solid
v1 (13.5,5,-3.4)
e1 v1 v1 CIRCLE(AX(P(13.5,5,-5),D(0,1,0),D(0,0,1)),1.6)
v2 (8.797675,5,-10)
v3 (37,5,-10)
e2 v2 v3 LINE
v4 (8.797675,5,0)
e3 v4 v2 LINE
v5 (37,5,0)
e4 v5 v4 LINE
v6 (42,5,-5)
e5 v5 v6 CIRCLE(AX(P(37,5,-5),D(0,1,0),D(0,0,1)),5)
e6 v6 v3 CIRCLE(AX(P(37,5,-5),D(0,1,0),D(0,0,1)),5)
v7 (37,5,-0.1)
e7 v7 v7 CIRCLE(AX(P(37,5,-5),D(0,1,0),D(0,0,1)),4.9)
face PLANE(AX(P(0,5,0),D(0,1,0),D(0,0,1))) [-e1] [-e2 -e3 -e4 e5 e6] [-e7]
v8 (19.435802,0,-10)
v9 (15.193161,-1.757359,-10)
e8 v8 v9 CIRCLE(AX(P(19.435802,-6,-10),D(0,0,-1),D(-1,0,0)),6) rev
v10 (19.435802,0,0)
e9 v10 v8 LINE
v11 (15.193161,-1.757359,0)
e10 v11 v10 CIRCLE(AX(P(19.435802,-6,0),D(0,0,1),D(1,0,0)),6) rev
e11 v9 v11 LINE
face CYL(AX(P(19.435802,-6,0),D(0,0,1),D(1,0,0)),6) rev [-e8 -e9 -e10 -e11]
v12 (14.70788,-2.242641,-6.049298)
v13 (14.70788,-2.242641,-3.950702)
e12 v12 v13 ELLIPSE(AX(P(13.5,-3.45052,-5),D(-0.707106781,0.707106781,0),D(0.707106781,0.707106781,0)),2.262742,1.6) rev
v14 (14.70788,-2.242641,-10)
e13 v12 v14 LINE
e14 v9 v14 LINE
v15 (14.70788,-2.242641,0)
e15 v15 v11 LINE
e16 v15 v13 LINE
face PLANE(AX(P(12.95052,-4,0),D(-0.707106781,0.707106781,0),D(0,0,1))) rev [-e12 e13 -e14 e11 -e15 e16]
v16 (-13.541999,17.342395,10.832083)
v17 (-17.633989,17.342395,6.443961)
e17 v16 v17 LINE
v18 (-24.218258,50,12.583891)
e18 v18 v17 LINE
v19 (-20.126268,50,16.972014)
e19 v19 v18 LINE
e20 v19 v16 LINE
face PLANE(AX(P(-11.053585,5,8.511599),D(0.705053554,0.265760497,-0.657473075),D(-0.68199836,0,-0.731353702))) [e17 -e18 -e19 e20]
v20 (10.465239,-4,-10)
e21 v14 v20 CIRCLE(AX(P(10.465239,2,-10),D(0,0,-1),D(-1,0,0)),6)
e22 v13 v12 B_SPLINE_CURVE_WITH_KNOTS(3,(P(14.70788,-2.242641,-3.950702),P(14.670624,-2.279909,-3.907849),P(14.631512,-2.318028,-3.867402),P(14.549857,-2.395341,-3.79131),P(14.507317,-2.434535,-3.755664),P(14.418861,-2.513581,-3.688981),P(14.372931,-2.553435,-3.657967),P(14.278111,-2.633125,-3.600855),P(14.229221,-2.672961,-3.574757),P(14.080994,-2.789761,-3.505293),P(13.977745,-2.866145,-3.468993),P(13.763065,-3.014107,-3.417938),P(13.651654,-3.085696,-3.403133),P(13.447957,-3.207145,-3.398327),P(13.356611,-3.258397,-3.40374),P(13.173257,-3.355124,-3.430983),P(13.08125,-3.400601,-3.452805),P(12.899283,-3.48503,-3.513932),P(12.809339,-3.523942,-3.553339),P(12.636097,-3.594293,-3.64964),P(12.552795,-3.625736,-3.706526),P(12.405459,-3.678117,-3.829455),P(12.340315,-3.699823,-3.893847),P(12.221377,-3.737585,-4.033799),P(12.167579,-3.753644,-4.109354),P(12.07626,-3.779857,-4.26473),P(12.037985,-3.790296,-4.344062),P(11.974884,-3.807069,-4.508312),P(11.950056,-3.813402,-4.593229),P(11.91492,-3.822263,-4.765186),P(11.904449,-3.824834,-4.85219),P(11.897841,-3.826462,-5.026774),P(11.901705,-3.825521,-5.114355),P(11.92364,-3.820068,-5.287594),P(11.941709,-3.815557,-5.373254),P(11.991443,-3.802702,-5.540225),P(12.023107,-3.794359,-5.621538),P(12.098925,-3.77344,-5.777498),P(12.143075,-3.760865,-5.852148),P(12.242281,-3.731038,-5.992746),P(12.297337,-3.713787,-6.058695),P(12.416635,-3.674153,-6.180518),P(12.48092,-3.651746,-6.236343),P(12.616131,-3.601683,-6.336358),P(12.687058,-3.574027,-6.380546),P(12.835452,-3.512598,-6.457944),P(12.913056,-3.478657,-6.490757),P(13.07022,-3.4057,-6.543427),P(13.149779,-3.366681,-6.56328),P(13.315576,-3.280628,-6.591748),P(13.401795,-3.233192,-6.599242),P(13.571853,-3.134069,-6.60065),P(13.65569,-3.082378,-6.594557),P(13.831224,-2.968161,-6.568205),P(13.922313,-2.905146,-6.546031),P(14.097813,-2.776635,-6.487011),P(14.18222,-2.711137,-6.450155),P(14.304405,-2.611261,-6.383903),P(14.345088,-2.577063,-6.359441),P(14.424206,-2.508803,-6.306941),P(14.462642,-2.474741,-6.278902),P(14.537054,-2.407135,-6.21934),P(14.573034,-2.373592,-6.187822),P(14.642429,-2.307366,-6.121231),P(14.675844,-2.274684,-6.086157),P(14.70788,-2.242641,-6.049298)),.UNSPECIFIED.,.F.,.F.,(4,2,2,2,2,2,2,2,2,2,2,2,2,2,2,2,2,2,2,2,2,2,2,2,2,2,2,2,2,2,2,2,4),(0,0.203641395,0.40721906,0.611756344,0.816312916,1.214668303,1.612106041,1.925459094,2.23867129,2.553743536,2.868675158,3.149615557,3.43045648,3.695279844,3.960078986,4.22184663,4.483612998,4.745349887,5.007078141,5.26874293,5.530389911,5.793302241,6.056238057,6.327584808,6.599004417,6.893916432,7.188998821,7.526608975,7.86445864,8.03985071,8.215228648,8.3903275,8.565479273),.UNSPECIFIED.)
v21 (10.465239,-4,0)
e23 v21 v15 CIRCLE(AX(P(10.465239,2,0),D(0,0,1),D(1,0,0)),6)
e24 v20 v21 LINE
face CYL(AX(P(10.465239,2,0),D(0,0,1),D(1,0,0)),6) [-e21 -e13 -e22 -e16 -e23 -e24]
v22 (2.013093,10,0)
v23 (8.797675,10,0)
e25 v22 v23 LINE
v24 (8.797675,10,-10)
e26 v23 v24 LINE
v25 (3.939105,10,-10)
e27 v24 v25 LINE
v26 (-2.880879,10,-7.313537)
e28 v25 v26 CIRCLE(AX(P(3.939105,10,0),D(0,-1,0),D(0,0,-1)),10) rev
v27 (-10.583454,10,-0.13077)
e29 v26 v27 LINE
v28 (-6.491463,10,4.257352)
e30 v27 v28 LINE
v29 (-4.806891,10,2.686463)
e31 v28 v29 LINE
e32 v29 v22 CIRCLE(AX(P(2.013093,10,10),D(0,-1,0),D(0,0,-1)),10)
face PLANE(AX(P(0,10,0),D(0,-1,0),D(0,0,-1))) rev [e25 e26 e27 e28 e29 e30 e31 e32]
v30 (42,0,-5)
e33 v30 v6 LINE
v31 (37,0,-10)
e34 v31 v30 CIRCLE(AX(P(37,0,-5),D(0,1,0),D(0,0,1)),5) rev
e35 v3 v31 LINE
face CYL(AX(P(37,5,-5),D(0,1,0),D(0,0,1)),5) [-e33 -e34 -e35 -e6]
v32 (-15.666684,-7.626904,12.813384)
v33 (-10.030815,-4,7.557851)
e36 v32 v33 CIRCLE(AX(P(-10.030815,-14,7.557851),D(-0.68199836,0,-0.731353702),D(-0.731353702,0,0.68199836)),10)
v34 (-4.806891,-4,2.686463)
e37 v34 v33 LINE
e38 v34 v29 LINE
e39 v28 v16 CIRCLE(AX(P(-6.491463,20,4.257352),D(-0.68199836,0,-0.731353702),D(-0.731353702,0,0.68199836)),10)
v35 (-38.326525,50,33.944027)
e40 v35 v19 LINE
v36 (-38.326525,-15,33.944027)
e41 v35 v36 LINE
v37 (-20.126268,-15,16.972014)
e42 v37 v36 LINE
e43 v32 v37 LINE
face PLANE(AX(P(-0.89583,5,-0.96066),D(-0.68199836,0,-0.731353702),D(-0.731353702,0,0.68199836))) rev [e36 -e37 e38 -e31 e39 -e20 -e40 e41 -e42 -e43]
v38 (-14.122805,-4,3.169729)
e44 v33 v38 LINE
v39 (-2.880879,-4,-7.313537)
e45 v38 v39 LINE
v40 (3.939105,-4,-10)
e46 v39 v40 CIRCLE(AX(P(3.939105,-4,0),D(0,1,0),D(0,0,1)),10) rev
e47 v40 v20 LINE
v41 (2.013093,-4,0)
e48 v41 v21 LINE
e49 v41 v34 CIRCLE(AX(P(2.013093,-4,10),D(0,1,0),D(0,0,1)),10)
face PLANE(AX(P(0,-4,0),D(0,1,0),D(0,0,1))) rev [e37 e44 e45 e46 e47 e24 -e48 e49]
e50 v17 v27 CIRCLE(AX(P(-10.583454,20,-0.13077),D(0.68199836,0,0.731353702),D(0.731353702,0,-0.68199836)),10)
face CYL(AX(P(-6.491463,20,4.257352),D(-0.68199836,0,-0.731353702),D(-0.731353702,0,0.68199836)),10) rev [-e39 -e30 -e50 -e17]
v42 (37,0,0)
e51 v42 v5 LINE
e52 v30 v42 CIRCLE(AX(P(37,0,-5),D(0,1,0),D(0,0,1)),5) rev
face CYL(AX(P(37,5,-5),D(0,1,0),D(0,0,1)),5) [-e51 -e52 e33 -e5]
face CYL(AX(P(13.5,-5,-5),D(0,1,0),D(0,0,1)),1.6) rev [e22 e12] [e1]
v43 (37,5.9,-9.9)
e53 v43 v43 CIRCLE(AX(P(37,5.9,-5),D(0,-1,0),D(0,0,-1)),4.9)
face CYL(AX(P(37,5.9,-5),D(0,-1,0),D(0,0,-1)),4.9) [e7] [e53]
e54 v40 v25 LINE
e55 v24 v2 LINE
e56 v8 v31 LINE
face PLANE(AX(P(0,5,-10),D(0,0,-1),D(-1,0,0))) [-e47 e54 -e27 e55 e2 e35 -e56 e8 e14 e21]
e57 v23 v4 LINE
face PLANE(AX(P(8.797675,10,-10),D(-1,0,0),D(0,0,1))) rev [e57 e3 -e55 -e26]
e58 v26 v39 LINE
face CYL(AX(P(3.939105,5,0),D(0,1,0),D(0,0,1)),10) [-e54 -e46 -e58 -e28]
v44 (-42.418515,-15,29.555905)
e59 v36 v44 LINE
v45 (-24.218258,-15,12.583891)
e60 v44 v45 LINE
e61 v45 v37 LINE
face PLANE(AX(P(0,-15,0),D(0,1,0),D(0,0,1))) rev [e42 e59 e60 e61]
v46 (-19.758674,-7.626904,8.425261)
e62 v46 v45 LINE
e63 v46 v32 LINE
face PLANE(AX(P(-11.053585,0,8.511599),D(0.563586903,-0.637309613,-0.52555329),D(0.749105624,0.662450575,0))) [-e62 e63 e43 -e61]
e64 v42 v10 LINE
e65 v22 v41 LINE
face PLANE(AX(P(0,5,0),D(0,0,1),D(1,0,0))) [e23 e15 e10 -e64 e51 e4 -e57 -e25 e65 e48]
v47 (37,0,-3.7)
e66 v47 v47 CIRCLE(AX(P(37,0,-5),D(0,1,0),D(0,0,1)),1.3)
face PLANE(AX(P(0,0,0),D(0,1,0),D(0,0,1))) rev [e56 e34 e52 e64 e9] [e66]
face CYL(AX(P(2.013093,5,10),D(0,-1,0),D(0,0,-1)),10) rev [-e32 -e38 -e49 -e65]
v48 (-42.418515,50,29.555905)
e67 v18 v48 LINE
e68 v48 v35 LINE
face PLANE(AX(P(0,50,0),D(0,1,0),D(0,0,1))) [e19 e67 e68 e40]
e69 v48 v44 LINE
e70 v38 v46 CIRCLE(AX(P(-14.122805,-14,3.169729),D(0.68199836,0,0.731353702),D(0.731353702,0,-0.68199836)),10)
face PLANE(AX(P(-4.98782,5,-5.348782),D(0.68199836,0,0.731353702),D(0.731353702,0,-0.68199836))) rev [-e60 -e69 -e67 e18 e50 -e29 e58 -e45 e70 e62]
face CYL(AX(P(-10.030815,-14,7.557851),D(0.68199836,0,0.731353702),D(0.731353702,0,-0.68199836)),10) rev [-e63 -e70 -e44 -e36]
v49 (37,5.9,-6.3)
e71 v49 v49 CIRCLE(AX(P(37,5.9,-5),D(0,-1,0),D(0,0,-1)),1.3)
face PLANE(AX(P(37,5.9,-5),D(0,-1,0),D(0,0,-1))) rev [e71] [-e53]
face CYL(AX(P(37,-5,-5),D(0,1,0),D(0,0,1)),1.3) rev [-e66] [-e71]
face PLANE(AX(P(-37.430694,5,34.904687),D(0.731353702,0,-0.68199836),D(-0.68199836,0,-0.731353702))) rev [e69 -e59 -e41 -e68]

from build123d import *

# Parameters (mm, degrees)
BOSS_EXTRUDE1_DEPTH = 5
FILLET1_R           = 5
SKETCH2_R           = 1.3
CUT_EXTRUDE1_DEPTH  = 10
BOSS_EXTRUDE2_DEPTH = 45
BOSS_EXTRUDE3_DEPTH = 15
BOSS_EXTRUDE4_DEPTH = 6
BOSS_EXTRUDE5_START = -5.9
SKETCH6_R           = 4.9
SKETCH6_R_2         = 1.3
BOSS_EXTRUDE5_DEPTH = 5.9
BOSS_EXTRUDE6_DEPTH = 4
BOSS_EXTRUDE7_DEPTH = 5
BOSS_EXTRUDE8_DEPTH = 9
CHAMFER1_SIZE       = 5
FILLET2_R           = 6
SKETCH11_R          = 1.6
CUT_EXTRUDE2_DEPTH  = 10
FILLET3_R           = 10


# Some blends are built 0.0001 mm under size
with BuildPart() as part:
    # Sketch1 → Boss-Extrude1 (new body)
    with BuildSketch(Plane(origin=(0, 0, 0), x_dir=(1, 0, 0), z_dir=(0, 1, 0))):
        Polygon((4.09199016, 5.61187779), (0, 10), (0, 1.796035233), align=None)
        Polygon((0, 1.796035233), (0, 10), (-42.418514694, -29.555904884), (-38.326524534, -33.944027093), (-1.926011986, 0), align=None)
        Polygon((42, 10), (0, 10), (4.09199016, 5.61187779), (0, 1.796035233), (0, 0), (42, 0), align=None)
        Polygon((0, 0), (0, 1.796035233), (-1.926011986, 0), align=None)
    extrude(amount=BOSS_EXTRUDE1_DEPTH)

    # Fillet1
    fillet1_edges = [part.edges().sort_by_distance(p)[0] for p in [
        (42, 2.5, 0),
        (42, 2.5, -10),
    ]]
    fillet(fillet1_edges, radius=FILLET1_R - 0.0001)  # a hair under: the kernel refuses the full size

    # Sketch2 → Cut-Extrude1 (cut)
    with BuildSketch(Plane(origin=(0, 5, 0), x_dir=(1, 0, 0), z_dir=(0, 1, 0))):
        with Locations(Location((37, 5, 0), (0, 0, 270))):
            Circle(SKETCH2_R)
    extrude(amount=-CUT_EXTRUDE1_DEPTH, mode=Mode.SUBTRACT)

    # Sketch3 → Boss-Extrude2 (add)
    with BuildSketch(Plane(origin=(0, 5, 0), x_dir=(1, 0, 0), z_dir=(0, 1, 0))):
        Polygon((-42.418514694, -29.555904884), (-38.326524534, -33.944027093), (-20.12626826, -16.972013547), (-24.21825842, -12.583891337), align=None)
    extrude(amount=BOSS_EXTRUDE2_DEPTH)

    # Sketch4 → Boss-Extrude3 (add)
    with BuildSketch(Plane.XZ):
        Polygon((-42.418514694, 29.555904884), (-38.326524534, 33.944027093), (-20.12626826, 16.972013547), (-24.21825842, 12.583891337), align=None)
    extrude(amount=BOSS_EXTRUDE3_DEPTH)

    # Sketch5 → Boss-Extrude4 (add)
    with BuildSketch(Plane(origin=(-4.987820251, 0, -5.348782369), x_dir=(-0.7313537016191739, 0, 0.6819983600624947), z_dir=(-0.6819983600624948, 0, -0.731353701619174))):
        Polygon((26.294306197, -15), (26.294306197, 0), (13.888976828, 0), align=None)
        Polygon((13.888976828, 5), (26.294306197, 50), (26.294306197, 5), align=None)
    extrude(amount=-BOSS_EXTRUDE4_DEPTH)

    # Sketch6 → Boss-Extrude5 (add)
    with BuildSketch(Plane.XZ.offset(BOSS_EXTRUDE5_START)):
        with Locations(Location((37, -5, 0), (0, 0, 270))):
            Circle(SKETCH6_R)
        with Locations(Location((37, -5, 0), (0, 0, 90))):
            Circle(SKETCH6_R_2, mode=Mode.SUBTRACT)
    extrude(amount=BOSS_EXTRUDE5_DEPTH)

    # Sketch8 → Boss-Extrude6 (add)
    with BuildSketch(Plane.XZ):
        Polygon((0, -10), (-19.681916643, 8.353684194), (-15.589926483, 12.741806404), (8.797675114, -10), align=None)
    extrude(amount=BOSS_EXTRUDE6_DEPTH)

    # Sketch10 → Boss-Extrude7 (add)
    with BuildSketch(Plane(origin=(0, 5, 0), x_dir=(1, 0, 0), z_dir=(0, 1, 0))):
        Polygon((8.797675114, 10), (8.797675114, 0), (-1.926011986, 0), (-16.799617624, -13.869861642), (-20.891607784, -9.481739432), (0, 10), align=None)
    extrude(amount=BOSS_EXTRUDE7_DEPTH)

    # Sketch9 → Boss-Extrude8 (add)
    with BuildSketch(Plane(origin=(0, 5, 0), x_dir=(1, 0, 0), z_dir=(0, 1, 0))):
        Polygon((17.950520425, 10), (8.797675114, 10), (-1.926011986, 0), (8.797675114, 0), (17.950520425, 0), align=None)
    extrude(amount=-BOSS_EXTRUDE8_DEPTH)

    # Chamfer1
    # the kernel refuses this chamfer: 5 mm, written as the material it adds along each edge
    # the kernel refuses this chamfer: 5 mm, written as the material it takes off along each edge
    with BuildSketch(Plane(origin=(17.950520425, -4, 12.85841494), x_dir=(0.027495876610586317, 0.9996219169112968, 0), z_dir=(0, 0, -1))) as chamfer1_2_piece_1_section:
        Polygon((CHAMFER1_SIZE * 0.999621916911, -CHAMFER1_SIZE * 0.0274958766106), (-CHAMFER1_SIZE * 0.0274958766106, -CHAMFER1_SIZE * 0.999621916911), (0, 0), align=None)
    chamfer1_2_piece_1 = extrude(amount=35.71682988, mode=Mode.PRIVATE)
    chamfer1_2_piece_1 = split(chamfer1_2_piece_1, bisect_by=Plane(origin=(16.228298203, 0, -5), z_dir=(0, -1, 0)), keep=Keep.TOP, mode=Mode.PRIVATE)
    add(chamfer1_2_piece_1, mode=Mode.SUBTRACT)

    # Fillet2
    fillet2_edges = [part.edges().sort_by_distance(p)[0] for p in [
        (12.950520425, -4, -5),
        (16.950520425, 0, -5),
    ]]
    fillet(fillet2_edges, radius=FILLET2_R)

    # Sketch11 → Cut-Extrude2 (cut)
    with BuildSketch(Plane(origin=(0, 5, 0), x_dir=(1, 0, 0), z_dir=(0, 1, 0))):
        with Locations(Location((13.5, 5, 0), (0, 0, 270))):
            Circle(SKETCH11_R)
    extrude(amount=-CUT_EXTRUDE2_DEPTH, mode=Mode.SUBTRACT)

    # Fillet3
    fillet3_edges = [part.edges().sort_by_distance(p)[0] for p in [
        (-14.107655737, 10, 7.257584188),
        (-1.926011986, 3, 0),
        (0, 3, -10),
        (-15.518962067, -4, 8.573648632),
    ]]
    fillet(fillet3_edges, radius=FILLET3_R)


solid = part.part
